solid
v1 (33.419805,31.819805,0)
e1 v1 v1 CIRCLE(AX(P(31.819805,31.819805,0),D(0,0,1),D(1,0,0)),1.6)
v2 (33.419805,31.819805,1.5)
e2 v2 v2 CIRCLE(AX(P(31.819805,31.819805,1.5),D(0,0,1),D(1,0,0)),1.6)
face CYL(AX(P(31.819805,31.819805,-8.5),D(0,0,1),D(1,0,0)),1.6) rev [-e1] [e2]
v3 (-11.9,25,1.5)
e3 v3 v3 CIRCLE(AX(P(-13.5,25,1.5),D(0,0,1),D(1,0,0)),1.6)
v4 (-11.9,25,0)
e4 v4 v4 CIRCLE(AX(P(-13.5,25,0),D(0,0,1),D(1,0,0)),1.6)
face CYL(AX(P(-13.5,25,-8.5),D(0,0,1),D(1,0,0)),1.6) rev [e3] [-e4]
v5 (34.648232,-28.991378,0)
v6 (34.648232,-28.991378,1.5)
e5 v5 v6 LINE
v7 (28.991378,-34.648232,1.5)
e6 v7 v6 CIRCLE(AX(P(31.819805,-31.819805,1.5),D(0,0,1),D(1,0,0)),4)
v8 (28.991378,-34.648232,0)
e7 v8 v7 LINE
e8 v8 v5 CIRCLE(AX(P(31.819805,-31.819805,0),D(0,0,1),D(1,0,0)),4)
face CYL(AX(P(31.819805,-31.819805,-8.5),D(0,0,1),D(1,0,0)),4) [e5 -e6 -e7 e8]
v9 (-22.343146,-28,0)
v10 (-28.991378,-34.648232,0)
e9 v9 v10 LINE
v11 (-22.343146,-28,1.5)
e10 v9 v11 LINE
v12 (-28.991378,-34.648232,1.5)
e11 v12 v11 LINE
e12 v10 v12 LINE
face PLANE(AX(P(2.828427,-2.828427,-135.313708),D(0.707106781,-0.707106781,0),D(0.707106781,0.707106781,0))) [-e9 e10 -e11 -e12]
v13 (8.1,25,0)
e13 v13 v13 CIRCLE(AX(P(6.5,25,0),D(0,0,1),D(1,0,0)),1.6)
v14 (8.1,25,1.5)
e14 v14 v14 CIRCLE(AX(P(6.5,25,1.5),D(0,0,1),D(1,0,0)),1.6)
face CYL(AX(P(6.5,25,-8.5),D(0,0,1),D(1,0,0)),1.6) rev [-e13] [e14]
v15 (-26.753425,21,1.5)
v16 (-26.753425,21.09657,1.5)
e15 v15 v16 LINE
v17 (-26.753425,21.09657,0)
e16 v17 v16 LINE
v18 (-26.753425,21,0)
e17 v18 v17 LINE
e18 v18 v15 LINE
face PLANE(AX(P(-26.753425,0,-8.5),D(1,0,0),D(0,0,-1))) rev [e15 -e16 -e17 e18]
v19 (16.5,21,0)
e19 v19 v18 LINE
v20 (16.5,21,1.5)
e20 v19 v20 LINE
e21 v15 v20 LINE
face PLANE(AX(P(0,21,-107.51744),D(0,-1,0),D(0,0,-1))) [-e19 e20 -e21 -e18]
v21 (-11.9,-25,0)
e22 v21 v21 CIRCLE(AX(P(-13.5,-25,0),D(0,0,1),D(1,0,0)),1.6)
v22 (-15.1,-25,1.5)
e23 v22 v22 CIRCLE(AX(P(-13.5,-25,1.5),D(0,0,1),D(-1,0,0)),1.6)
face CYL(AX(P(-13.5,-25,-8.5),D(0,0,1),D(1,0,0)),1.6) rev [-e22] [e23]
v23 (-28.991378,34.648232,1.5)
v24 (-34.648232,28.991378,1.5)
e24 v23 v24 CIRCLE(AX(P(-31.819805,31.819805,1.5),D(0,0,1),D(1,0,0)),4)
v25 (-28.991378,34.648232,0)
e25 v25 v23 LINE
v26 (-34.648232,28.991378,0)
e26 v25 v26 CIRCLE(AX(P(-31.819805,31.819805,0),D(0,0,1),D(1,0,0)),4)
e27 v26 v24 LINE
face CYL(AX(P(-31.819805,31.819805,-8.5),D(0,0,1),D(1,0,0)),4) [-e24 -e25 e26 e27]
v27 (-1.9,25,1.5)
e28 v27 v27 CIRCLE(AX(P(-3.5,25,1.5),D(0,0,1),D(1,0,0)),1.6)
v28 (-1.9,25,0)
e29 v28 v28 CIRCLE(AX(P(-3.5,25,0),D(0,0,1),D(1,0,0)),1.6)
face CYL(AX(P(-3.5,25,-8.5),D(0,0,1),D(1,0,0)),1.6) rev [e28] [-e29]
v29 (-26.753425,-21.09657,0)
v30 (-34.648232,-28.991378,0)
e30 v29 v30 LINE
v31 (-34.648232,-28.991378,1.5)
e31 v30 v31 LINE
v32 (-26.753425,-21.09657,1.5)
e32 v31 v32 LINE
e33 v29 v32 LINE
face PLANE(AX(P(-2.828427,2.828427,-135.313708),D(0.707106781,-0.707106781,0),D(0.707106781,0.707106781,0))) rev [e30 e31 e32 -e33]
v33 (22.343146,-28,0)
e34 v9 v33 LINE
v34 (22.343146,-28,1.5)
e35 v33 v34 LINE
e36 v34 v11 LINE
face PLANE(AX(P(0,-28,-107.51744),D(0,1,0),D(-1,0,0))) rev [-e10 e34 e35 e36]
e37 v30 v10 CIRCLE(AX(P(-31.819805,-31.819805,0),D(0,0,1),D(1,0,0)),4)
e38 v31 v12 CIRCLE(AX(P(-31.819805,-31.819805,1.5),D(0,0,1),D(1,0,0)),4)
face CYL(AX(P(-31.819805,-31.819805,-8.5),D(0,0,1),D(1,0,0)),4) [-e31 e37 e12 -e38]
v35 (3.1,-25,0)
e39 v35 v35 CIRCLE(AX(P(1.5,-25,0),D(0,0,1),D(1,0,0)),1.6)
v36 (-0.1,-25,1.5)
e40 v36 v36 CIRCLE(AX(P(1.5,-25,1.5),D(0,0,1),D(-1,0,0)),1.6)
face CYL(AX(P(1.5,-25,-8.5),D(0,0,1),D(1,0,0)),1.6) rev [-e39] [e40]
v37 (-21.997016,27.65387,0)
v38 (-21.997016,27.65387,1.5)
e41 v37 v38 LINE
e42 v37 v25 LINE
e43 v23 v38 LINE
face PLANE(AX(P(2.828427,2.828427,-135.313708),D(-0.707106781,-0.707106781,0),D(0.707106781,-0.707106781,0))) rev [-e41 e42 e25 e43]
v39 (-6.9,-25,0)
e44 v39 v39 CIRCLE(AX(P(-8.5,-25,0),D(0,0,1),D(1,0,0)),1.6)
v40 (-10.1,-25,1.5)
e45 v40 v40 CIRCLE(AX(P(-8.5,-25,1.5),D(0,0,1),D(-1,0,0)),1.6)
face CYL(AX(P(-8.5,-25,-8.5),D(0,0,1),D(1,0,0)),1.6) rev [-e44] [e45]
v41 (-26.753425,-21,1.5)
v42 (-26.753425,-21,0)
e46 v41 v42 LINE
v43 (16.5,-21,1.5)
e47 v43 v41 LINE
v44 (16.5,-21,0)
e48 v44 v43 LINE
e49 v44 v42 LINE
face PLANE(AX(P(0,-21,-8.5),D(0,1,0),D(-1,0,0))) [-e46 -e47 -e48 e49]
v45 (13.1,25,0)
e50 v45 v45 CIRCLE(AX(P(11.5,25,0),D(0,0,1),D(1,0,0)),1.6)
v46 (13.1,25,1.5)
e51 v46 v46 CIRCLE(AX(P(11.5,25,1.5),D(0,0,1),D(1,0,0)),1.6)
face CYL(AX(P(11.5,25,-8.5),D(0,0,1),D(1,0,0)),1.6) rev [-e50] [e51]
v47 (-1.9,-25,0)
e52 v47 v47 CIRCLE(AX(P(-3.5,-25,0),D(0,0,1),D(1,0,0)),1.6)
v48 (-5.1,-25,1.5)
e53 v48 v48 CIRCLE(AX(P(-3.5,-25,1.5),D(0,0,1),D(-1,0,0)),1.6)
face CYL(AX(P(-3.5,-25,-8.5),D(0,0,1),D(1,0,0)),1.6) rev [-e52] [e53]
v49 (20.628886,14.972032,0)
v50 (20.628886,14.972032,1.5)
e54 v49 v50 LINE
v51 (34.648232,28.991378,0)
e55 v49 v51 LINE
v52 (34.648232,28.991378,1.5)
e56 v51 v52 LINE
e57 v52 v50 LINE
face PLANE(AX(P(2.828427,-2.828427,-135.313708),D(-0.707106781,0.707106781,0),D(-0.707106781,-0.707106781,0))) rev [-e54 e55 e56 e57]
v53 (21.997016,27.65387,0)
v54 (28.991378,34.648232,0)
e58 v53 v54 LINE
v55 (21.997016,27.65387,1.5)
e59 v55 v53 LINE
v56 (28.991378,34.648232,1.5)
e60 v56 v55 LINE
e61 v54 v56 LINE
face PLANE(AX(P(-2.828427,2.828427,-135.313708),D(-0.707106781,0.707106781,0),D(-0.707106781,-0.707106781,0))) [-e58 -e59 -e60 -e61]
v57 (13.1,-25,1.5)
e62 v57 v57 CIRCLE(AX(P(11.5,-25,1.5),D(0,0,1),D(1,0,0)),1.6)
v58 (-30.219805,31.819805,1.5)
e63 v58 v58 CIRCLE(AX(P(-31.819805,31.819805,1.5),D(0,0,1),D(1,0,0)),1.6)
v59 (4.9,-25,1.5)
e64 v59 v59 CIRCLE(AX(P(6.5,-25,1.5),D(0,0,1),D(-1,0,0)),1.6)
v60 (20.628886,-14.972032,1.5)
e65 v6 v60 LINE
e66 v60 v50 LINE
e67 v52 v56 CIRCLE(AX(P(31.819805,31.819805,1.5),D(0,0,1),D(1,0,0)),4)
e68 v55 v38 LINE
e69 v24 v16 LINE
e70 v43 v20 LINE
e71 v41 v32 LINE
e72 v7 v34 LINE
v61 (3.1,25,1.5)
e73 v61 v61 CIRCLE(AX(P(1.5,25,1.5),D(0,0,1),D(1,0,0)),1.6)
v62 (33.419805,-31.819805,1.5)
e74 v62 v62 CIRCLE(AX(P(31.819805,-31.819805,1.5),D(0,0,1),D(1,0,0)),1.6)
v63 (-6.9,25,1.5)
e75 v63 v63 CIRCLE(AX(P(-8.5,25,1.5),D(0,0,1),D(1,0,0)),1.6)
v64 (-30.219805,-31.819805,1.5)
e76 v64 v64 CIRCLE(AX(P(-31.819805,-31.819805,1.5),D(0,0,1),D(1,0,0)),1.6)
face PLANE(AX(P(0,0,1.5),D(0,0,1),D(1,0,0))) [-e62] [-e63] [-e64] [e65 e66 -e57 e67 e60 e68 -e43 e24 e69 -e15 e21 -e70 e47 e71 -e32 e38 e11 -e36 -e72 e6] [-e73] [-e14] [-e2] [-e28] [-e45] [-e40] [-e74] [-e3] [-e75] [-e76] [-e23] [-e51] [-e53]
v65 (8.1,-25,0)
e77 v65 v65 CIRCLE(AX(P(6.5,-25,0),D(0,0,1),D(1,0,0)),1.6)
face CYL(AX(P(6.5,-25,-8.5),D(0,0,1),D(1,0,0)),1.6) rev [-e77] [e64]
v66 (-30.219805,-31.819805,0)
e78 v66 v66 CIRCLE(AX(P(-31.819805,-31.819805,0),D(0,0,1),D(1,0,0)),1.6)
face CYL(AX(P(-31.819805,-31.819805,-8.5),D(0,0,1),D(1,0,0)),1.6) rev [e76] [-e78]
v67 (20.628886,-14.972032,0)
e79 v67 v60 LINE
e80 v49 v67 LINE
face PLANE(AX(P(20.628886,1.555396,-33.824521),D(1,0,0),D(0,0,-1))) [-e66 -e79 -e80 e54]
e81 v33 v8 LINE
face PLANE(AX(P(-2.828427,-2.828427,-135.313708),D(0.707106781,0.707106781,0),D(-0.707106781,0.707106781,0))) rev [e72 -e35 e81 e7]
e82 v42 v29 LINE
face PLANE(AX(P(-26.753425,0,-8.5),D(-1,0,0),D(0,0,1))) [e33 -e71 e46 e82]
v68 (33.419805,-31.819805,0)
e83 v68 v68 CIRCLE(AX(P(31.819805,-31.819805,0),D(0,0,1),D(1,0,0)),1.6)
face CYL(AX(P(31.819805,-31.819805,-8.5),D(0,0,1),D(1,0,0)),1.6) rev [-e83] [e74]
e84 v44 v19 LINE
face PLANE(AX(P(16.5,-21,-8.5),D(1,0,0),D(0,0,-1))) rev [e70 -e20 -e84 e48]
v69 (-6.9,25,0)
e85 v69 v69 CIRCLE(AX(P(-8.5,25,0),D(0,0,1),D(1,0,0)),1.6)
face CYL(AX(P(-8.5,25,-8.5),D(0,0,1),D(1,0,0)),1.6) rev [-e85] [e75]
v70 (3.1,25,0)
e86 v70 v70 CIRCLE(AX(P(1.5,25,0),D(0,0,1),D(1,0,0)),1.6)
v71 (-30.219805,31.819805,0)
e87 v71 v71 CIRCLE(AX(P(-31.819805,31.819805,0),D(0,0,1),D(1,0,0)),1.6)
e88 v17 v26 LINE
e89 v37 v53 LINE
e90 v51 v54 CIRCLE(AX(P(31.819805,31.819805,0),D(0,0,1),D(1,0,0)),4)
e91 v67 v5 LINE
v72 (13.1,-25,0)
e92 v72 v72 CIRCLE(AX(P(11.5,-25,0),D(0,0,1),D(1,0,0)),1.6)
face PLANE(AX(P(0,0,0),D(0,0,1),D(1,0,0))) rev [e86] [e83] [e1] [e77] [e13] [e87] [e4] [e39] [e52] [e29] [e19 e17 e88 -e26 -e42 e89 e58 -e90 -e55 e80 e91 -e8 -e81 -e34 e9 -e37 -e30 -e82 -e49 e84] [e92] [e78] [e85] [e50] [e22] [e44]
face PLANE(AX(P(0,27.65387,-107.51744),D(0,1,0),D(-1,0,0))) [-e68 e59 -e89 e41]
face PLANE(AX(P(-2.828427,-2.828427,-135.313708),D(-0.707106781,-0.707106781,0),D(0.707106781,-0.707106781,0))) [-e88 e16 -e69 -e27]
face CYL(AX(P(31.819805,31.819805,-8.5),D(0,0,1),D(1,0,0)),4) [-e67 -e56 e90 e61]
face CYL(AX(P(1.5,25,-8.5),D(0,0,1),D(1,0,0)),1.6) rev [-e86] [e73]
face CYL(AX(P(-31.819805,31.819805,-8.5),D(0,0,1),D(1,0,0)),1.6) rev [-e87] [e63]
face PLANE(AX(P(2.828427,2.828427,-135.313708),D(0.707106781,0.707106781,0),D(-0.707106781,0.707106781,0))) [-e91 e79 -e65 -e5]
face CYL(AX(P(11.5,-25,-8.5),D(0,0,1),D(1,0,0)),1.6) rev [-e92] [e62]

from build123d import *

# Parameters (mm, degrees)
CUT_EXTRUDE1_START       = -1.5
CUT_EXTRUDE1_OUTLINE_R   = 1.6
CUT_EXTRUDE1_DEPTH       = 1.5
CUT_EXTRUDE1_2_OUTLINE_R = 1.6
CUT_EXTRUDE1_2_DEPTH     = 1.5
CUT_EXTRUDE1_3_OUTLINE_R = 1.6
CUT_EXTRUDE1_3_DEPTH     = 1.5
BOSS_EXTRUDE1_DEPTH      = 1.5
BOSS_EXTRUDE2_DEPTH      = 1.5
BOSS_EXTRUDE3_START      = -1.5
SKETCH4_W                = 8
SKETCH4_H                = 34
SKETCH4_R                = 1.6
BOSS_EXTRUDE3_DEPTH      = 1.5
CUT_EXTRUDE2_DEPTH       = 10
SKETCH6_R                = 1.6
CUT_EXTRUDE3_DEPTH       = 10
CUT_EXTRUDE4_DEPTH       = 10
SKETCH8_R                = 1.6
CUT_EXTRUDE6_DEPTH       = 10
BOSS_EXTRUDE4_DEPTH      = 1.5
SKETCH10_W               = 3.5
SKETCH10_H               = 42
CUT_EXTRUDE7_DEPTH       = 10
CUT_EXTRUDE8_START       = -10
SKETCH11_R               = 1.6
CUT_EXTRUDE8_DEPTH       = 10
BOSS_EXTRUDE5_DEPTH      = 1.5
SKETCH13_R               = 1.6
BOSS_EXTRUDE6_DEPTH      = 1.5
SKETCH14_R               = 1.6
CUT_EXTRUDE9_DEPTH       = 10
BOSS_EXTRUDE7_DEPTH      = 1.5
SKETCH16_R               = 1.6
CUT_EXTRUDE10_DEPTH      = 10
SKETCH17_R               = 1.6
BOSS_EXTRUDE8_DEPTH      = 1.5
SKETCH18_R               = 1.6
CUT_EXTRUDE11_DEPTH      = 10
CUT_EXTRUDE12_START      = -2
CUT_EXTRUDE12_OUTLINE_R  = 1.6
CUT_EXTRUDE12_DEPTH      = 3
SKETCH20_R               = 1.6
BOSS_EXTRUDE9_DEPTH      = 1.5
SKETCH21_R               = 1.6
BOSS_EXTRUDE10_DEPTH     = 1.5
SKETCH22_R               = 89.618816207
CUT_EXTRUDE13_DEPTH      = 10


with BuildPart() as part:
    # Cut-Extrude1: read off the stored shape, not the designer's step
    # Cut-Extrude1 outline → Cut-Extrude1 (new body)
    with BuildSketch(Plane.XY.offset(1.5).offset(CUT_EXTRUDE1_START)):
        with BuildLine():
            ThreePointArc((-32.828427125, -27.171572875), (-32.828427125, -32.828427125), (-27.171572875, -32.828427125))
            Line((-27.171572875, -32.828427125), (-15.343145751, -21))
            Line((-15.343145751, -21), (-28, -21))
            Line((-28, -21), (-28, -22.246575342))
            Line((-28, -22.246575342), (-32.876712329, -27.123287671))
            Line((-32.876712329, -27.123287671), (-32.828427125, -27.171572875))
        make_face()
        with Locations((-30, -30)):
            Circle(CUT_EXTRUDE1_OUTLINE_R, mode=Mode.SUBTRACT)
    extrude(amount=CUT_EXTRUDE1_DEPTH)



with BuildPart() as body_2:
    # Cut-Extrude1 2 outline → Cut-Extrude1 2 (new body)
    with BuildSketch(Plane.XY.offset(1.5).offset(CUT_EXTRUDE1_START)):
        with BuildLine():
            Line((21, 31.740068927), (21, -13))
            Line((21, -13), (13, -13))
            Line((13, -13), (13, -20))
            Line((13, -20), (14.343145751, -20))
            Line((14.343145751, -20), (27.171572875, -32.828427125))
            ThreePointArc((27.171572875, -32.828427125), (32.828427125, -32.828427125), (32.828427125, -27.171572875))
            Line((32.828427125, -27.171572875), (28, -22.343145751))
            Line((28, -22.343145751), (28, 27.653870467))
            Line((28, 27.653870467), (36.085493114, 37.454468181))
            ThreePointArc((36.085493114, 37.454468181), (35.545531819, 43.085493114), (29.914506886, 42.545531819))
            Line((29.914506886, 42.545531819), (21, 31.740068927))
        make_face()
        with Locations((30, -30)):
            Circle(CUT_EXTRUDE1_2_OUTLINE_R, mode=Mode.SUBTRACT)
        with Locations((25, -6.5)):
            Circle(CUT_EXTRUDE1_2_OUTLINE_R, mode=Mode.SUBTRACT)
        with Locations((25, -1.5)):
            Circle(CUT_EXTRUDE1_2_OUTLINE_R, mode=Mode.SUBTRACT)
        with Locations((25, 3.5)):
            Circle(CUT_EXTRUDE1_2_OUTLINE_R, mode=Mode.SUBTRACT)
        with Locations((25, 8.5)):
            Circle(CUT_EXTRUDE1_2_OUTLINE_R, mode=Mode.SUBTRACT)
        with Locations((25, 13.5)):
            Circle(CUT_EXTRUDE1_2_OUTLINE_R, mode=Mode.SUBTRACT)
        with Locations((33, 40)):
            Circle(CUT_EXTRUDE1_2_OUTLINE_R, mode=Mode.SUBTRACT)
    extrude(amount=CUT_EXTRUDE1_2_DEPTH)



with BuildPart() as body_3:
    # Cut-Extrude1 3 outline → Cut-Extrude1 3 (new body)
    with BuildSketch(Plane.XY.offset(1.5).offset(CUT_EXTRUDE1_START)):
        with BuildLine():
            Line((-28, 21), (-21, 21))
            Line((-21, 21), (-21, 31.740068927))
            Line((-21, 31.740068927), (-29.914506886, 42.545531819))
            ThreePointArc((-29.914506886, 42.545531819), (-35.545531819, 43.085493114), (-36.085493114, 37.454468181))
            Line((-36.085493114, 37.454468181), (-28, 27.653870467))
            Line((-28, 27.653870467), (-28, 21))
        make_face()
        with Locations((-33, 40)):
            Circle(CUT_EXTRUDE1_3_OUTLINE_R, mode=Mode.SUBTRACT)
    extrude(amount=CUT_EXTRUDE1_3_DEPTH)


with BuildPart() as body_2_1:
    add(body_2.part)

    add(body_3.part)  # Boss-Extrude1 merges body 3
    # Sketch2 → Boss-Extrude1 (add)
    with BuildSketch(Plane.XY.offset(1.5)):
        Polygon((-21, 21), (21, 21), (21, 31.740068927), (17.62888627, 27.653870467), (-17.62888627, 27.653870467), (-21, 31.740068927), align=None)
    extrude(amount=-BOSS_EXTRUDE1_DEPTH)


with BuildPart() as part_1:
    add(part.part)

    add(body_2_1.part)  # Boss-Extrude2 merges body 2
    # Sketch3 → Boss-Extrude2 (add)
    with BuildSketch(Plane.XY.offset(1.5)):
        Polygon((-15.343145751, -21), (-22.343145751, -28), (22.343145751, -28), (15.343145751, -21), align=None)
    extrude(amount=-BOSS_EXTRUDE2_DEPTH)

    # Sketch4 → Boss-Extrude3 (add)
    with BuildSketch(Plane.XY.offset(1.5).offset(BOSS_EXTRUDE3_START)):
        Polygon((14.343145751, -20), (13, -20), (13, -21), (15.343145751, -21), align=None)
        with Locations((17, 4)):
            Rectangle(SKETCH4_W, SKETCH4_H)
        with Locations((25, -6.5)):
            Circle(SKETCH4_R)
        with Locations((25, -1.5)):
            Circle(SKETCH4_R)
        with Locations((25, 3.5)):
            Circle(SKETCH4_R)
        with Locations((25, 8.5)):
            Circle(SKETCH4_R)
        with Locations((25, 13.5)):
            Circle(SKETCH4_R)
    extrude(amount=BOSS_EXTRUDE3_DEPTH)

    # Sketch5 → Cut-Extrude2 (cut)
    with BuildSketch(Plane.XY.offset(1.5)):
        Polygon((28, 27.653870467), (17.62888627, 15.082823521), (17.62888627, -11.972032021), (28, -22.343145751), align=None)
    extrude(amount=-CUT_EXTRUDE2_DEPTH, mode=Mode.SUBTRACT)

    # Sketch6 → Cut-Extrude3 (cut)
    with BuildSketch(Plane.XY.offset(1.5)):
        with Locations((6.5, 25)):
            Circle(SKETCH6_R)
        with Locations((1.5, 25)):
            Circle(SKETCH6_R)
        with Locations((-3.5, 25)):
            Circle(SKETCH6_R)
        with Locations((-8.5, 25)):
            Circle(SKETCH6_R)
        with Locations((-13.5, 25)):
            Circle(SKETCH6_R)
        with Locations((-13.5, -25)):
            Circle(SKETCH6_R)
        with Locations((-8.5, -25)):
            Circle(SKETCH6_R)
        with Locations((-3.5, -25)):
            Circle(SKETCH6_R)
        with Locations((1.5, -25)):
            Circle(SKETCH6_R)
        with Locations((6.5, -25)):
            Circle(SKETCH6_R)
    extrude(amount=-CUT_EXTRUDE3_DEPTH, mode=Mode.SUBTRACT)

    # Sketch7 → Cut-Extrude4 (cut)
    with BuildSketch(Plane.XY.offset(1.5)):
        Polygon((-28, 27.653870467), (-19.973613934, 17.924917659), (-36.717571938, 15.874580857), align=None)
        Polygon((-28, -22.246575342), (-20.930672911, -15.177248254), (-29.189636074, -18.711911798), align=None)
    extrude(amount=-CUT_EXTRUDE4_DEPTH, mode=Mode.SUBTRACT)

    # Sketch8 → Cut-Extrude6 (cut)
    with BuildSketch(Plane.XY.offset(1.5)):
        with Locations((11.5, -25)):
            Circle(SKETCH8_R)
        with Locations((11.5, 25)):
            Circle(SKETCH8_R)
    extrude(amount=-CUT_EXTRUDE6_DEPTH, mode=Mode.SUBTRACT)

    # Sketch9 → Boss-Extrude4 (add)
    with BuildSketch(Plane.XY.offset(1.5)):
        Polygon((20.62888627, 1.55539575), (20.62888627, 18.719187158), (17.62888627, 15.082823521), (17.62888627, -11.972032021), (20.62888627, -14.972032021), align=None)
    extrude(amount=-BOSS_EXTRUDE4_DEPTH)

    # Sketch10 → Cut-Extrude7 (cut)
    with BuildSketch(Plane.XY.offset(1.5)):
        with Locations((14.75, 0)):
            Rectangle(SKETCH10_W, SKETCH10_H)
    extrude(amount=-CUT_EXTRUDE7_DEPTH, mode=Mode.SUBTRACT)

    # Sketch11 → Cut-Extrude8 (cut)
    # profile 1 of 4: a face of its own
    with BuildSketch(Plane.XY.offset(1.5).offset(CUT_EXTRUDE8_START)):
        with BuildLine():
            Line((20.62888627, 27.653870467), (20.62888627, 18.719187158))
            Line((20.62888627, 18.719187158), (36.085493114, 37.454468181))
            ThreePointArc((36.085493114, 37.454468181), (35.545531819, 43.085493114), (29.914506886, 42.545531819))
            Line((29.914506886, 42.545531819), (17.62888627, 27.653870467))
            Line((17.62888627, 27.653870467), (20.62888627, 27.653870467))
        make_face()
        with Locations((33, 40)):
            Circle(SKETCH11_R, mode=Mode.SUBTRACT)
    # profile 2 of 4: a face of its own
    with BuildSketch(Plane.XY.offset(1.5).offset(CUT_EXTRUDE8_START)):
        with BuildLine():
            Line((-36.085493114, 37.454468181), (-26.753424658, 26.142870052))
            Line((-26.753424658, 26.142870052), (-26.753424658, 27.653870467))
            Line((-26.753424658, 27.653870467), (-17.62888627, 27.653870467))
            Line((-17.62888627, 27.653870467), (-29.914506886, 42.545531819))
            ThreePointArc((-29.914506886, 42.545531819), (-35.545531819, 43.085493114), (-36.085493114, 37.454468181))
        make_face()
        with Locations((-33, 40)):
            Circle(SKETCH11_R, mode=Mode.SUBTRACT)
    # profile 3 of 4: a face of its own
    with BuildSketch(Plane.XY.offset(1.5).offset(CUT_EXTRUDE8_START)):
        with BuildLine():
            Line((-27.171572875, -32.828427125), (-22.343145751, -28))
            Line((-22.343145751, -28), (-26.753424658, -28))
            Line((-26.753424658, -28), (-26.753424658, -21))
            Line((-26.753424658, -21), (-32.876712329, -27.123287671))
            Line((-32.876712329, -27.123287671), (-32.828427125, -27.171572875))
            ThreePointArc((-32.828427125, -27.171572875), (-32.828427125, -32.828427125), (-27.171572875, -32.828427125))
        make_face()
        with Locations((-30, -30)):
            Circle(SKETCH11_R, mode=Mode.SUBTRACT)
    # profile 4 of 4: a face of its own
    with BuildSketch(Plane.XY.offset(1.5).offset(CUT_EXTRUDE8_START)):
        with BuildLine():
            Line((32.828427125, -27.171572875), (20.62888627, -14.972032021))
            Line((20.62888627, -14.972032021), (20.62888627, -28))
            Line((20.62888627, -28), (22.343145751, -28))
            Line((22.343145751, -28), (27.171572875, -32.828427125))
            ThreePointArc((27.171572875, -32.828427125), (32.828427125, -32.828427125), (32.828427125, -27.171572875))
        make_face()
        with Locations((30, -30)):
            Circle(SKETCH11_R, mode=Mode.SUBTRACT)
    extrude(amount=CUT_EXTRUDE8_DEPTH, mode=Mode.SUBTRACT)

    # Sketch12 → Boss-Extrude5 (add)
    with BuildSketch(Plane.XY.offset(1.5)):
        Polygon((-22.510556865, 21), (-26.753424658, 21), (-26.753424658, 26.142870052), align=None)
    extrude(amount=-BOSS_EXTRUDE5_DEPTH)

    # Sketch13 → Boss-Extrude6 (add)
    # profile 1 of 4: a face of its own
    with BuildSketch(Plane.XY.offset(1.5)):
        with BuildLine():
            Line((20.62888627, 26.28574052), (20.62888627, 14.972032021))
            Line((20.62888627, 14.972032021), (46.669047558, 41.012193309))
            ThreePointArc((46.669047558, 41.012193309), (46.669047558, 46.669047558), (41.012193309, 46.669047558))
            Line((41.012193309, 46.669047558), (20.62888627, 26.28574052))
        make_face()
    # profile 2 of 4: a face of its own
    with BuildSketch(Plane.XY.offset(1.5)):
        with BuildLine():
            Line((-46.669047558, 41.012193309), (-26.753424658, 21.096570408))
            Line((-26.753424658, 21.096570408), (-26.753424658, 27.653870467))
            Line((-26.753424658, 27.653870467), (-21.997016217, 27.653870467))
            Line((-21.997016217, 27.653870467), (-41.012193309, 46.669047558))
            ThreePointArc((-41.012193309, 46.669047558), (-46.669047558, 46.669047558), (-46.669047558, 41.012193309))
        make_face()
        with Locations((-43.840620434, 43.840620434)):
            Circle(SKETCH13_R, mode=Mode.SUBTRACT)
    # profile 3 of 4: a face of its own
    with BuildSketch(Plane.XY.offset(1.5)):
        with BuildLine():
            ThreePointArc((-46.669047558, -41.012193309), (-46.669047558, -46.669047558), (-41.012193309, -46.669047558))
            Line((-41.012193309, -46.669047558), (-22.343145751, -28))
            Line((-22.343145751, -28), (-26.753424658, -28))
            Line((-26.753424658, -28), (-26.753424658, -21.096570408))
            Line((-26.753424658, -21.096570408), (-46.669047558, -41.012193309))
        make_face()
        with Locations((-43.840620434, -43.840620434)):
            Circle(SKETCH13_R, mode=Mode.SUBTRACT)
    # profile 4 of 4: a face of its own
    with BuildSketch(Plane.XY.offset(1.5)):
        with BuildLine():
            Line((20.62888627, -26.28574052), (41.012193309, -46.669047558))
            ThreePointArc((41.012193309, -46.669047558), (46.669047558, -46.669047558), (46.669047558, -41.012193309))
            Line((46.669047558, -41.012193309), (20.62888627, -14.972032021))
            Line((20.62888627, -14.972032021), (20.62888627, -26.28574052))
        make_face()
        with Locations((43.840620434, -43.840620434)):
            Circle(SKETCH13_R, mode=Mode.SUBTRACT)
    extrude(amount=-BOSS_EXTRUDE6_DEPTH)

    # Sketch14 → Cut-Extrude9 (cut)
    with BuildSketch(Plane.XY.offset(1.5)):
        with Locations((43.840620434, 43.840620434)):
            Circle(SKETCH14_R)
    extrude(amount=-CUT_EXTRUDE9_DEPTH, mode=Mode.SUBTRACT)

    # Sketch15 → Boss-Extrude7 (add)
    with BuildSketch(Plane.XY.offset(1.5)):
        Polygon((20.62888627, -28), (22.343145751, -28), (22.343145751, -20.852318202), (17.520154223, -24.044979555), align=None)
        Polygon((20.62888627, 27.653870467), (24.477160925, 27.653870467), (19.074520247, 22.251229789), (17.520154223, 26.392880602), align=None)
    extrude(amount=-BOSS_EXTRUDE7_DEPTH)

    # Sketch16 → Cut-Extrude10 (cut)
    with BuildSketch(Plane.XY.offset(1.5)):
        with Locations((-31.819805153, 31.819805153)):
            Circle(SKETCH16_R)
        with Locations((31.819805153, 31.819805153)):
            Circle(SKETCH16_R)
        with Locations((31.819805153, -31.819805153)):
            Circle(SKETCH16_R)
        with Locations((-31.819805153, -31.819805153)):
            Circle(SKETCH16_R)
    extrude(amount=-CUT_EXTRUDE10_DEPTH, mode=Mode.SUBTRACT)

    # Sketch17 → Boss-Extrude8 (add)
    with BuildSketch(Plane.XY.offset(1.5)):
        with BuildLine():
            ThreePointArc((-31.819805153, 35.819805153), (-28.355703538, 33.819805153), (-28.355703538, 29.819805153))
            Line((-28.355703538, 29.819805153), (28.355703538, 29.819805153))
            ThreePointArc((28.355703538, 29.819805153), (28.355703538, 33.819805153), (31.819805153, 35.819805153))
            Line((31.819805153, 35.819805153), (-31.819805153, 35.819805153))
        make_face()
        with Locations((-8, 32.819805153)):
            Circle(SKETCH17_R, mode=Mode.SUBTRACT)
        with Locations((8, 32.819805153)):
            Circle(SKETCH17_R, mode=Mode.SUBTRACT)
    extrude(amount=-BOSS_EXTRUDE8_DEPTH)

    # Sketch18 → Cut-Extrude11 (cut)
    with BuildSketch(Plane.XY.offset(1.5)):
        with Locations((38.890872965, -38.890872965)):
            Circle(SKETCH18_R)
        with Locations((-38.890872965, -38.890872965)):
            Circle(SKETCH18_R)
        with Locations((38.890872965, 38.890872965)):
            Circle(SKETCH18_R)
        with Locations((-38.890872965, 38.890872965)):
            Circle(SKETCH18_R)
    extrude(amount=-CUT_EXTRUDE11_DEPTH, mode=Mode.SUBTRACT)

    # Cut-Extrude12: read off the stored shape, not the designer's step
    # Cut-Extrude12 outline → Cut-Extrude12 (cut)
    # profile 1 of 4: a face of its own
    with BuildSketch(Plane.XY.offset(1.5).offset(CUT_EXTRUDE12_START)):
        with BuildLine():
            Line((36.222978367, 41.879832617), (36.224492351, 41.872552763))
            ThreePointArc((36.224492351, 41.872552763), (41.797056095, 41.639345199), (41.71930009, 36.062445841))
            Line((41.71930009, 36.062445841), (46.669047558, 41.012193309))
            ThreePointArc((46.669047558, 41.012193309), (46.669047558, 46.669047558), (41.012193309, 46.669047558))
            Line((41.012193309, 46.669047558), (36.222978367, 41.879832617))
        make_face()
        with Locations((43.840620434, 43.840620434)):
            Circle(CUT_EXTRUDE12_OUTLINE_R, mode=Mode.SUBTRACT)
    # profile 2 of 4: a face of its own
    with BuildSketch(Plane.XY.offset(1.5).offset(CUT_EXTRUDE12_START)):
        with BuildLine():
            ThreePointArc((41.71930009, -36.062445841), (41.71930009, -41.71930009), (36.062445841, -41.71930009))
            Line((36.062445841, -41.71930009), (41.012193309, -46.669047558))
            ThreePointArc((41.012193309, -46.669047558), (46.669047558, -46.669047558), (46.669047558, -41.012193309))
            Line((46.669047558, -41.012193309), (41.71930009, -36.062445841))
        make_face()
        with Locations((43.840620434, -43.840620434)):
            Circle(CUT_EXTRUDE12_OUTLINE_R, mode=Mode.SUBTRACT)
    # profile 3 of 4: a face of its own
    with BuildSketch(Plane.XY.offset(1.5).offset(CUT_EXTRUDE12_START)):
        with BuildLine():
            ThreePointArc((-36.062445841, -41.71930009), (-41.550778866, -41.878330178), (-42.027335486, -36.408413931))
            Line((-42.027335486, -36.408413931), (-42.048509384, -36.391655135))
            Line((-42.048509384, -36.391655135), (-46.669047558, -41.012193309))
            ThreePointArc((-46.669047558, -41.012193309), (-46.669047558, -46.669047558), (-41.012193309, -46.669047558))
            Line((-41.012193309, -46.669047558), (-36.062445841, -41.71930009))
        make_face()
        with Locations((-43.840620434, -43.840620434)):
            Circle(CUT_EXTRUDE12_OUTLINE_R, mode=Mode.SUBTRACT)
    # profile 4 of 4: a face of its own
    with BuildSketch(Plane.XY.offset(1.5).offset(CUT_EXTRUDE12_START)):
        with BuildLine():
            ThreePointArc((-41.815610055, 36.162152944), (-41.66986379, 41.767887042), (-36.062445841, 41.71930009))
            Line((-36.062445841, 41.71930009), (-41.012193309, 46.669047558))
            ThreePointArc((-41.012193309, 46.669047558), (-46.669047558, 46.669047558), (-46.669047558, 41.012193309))
            Line((-46.669047558, 41.012193309), (-41.817773996, 36.160919747))
            Line((-41.817773996, 36.160919747), (-41.815610055, 36.162152944))
        make_face()
        with Locations((-43.840620434, 43.840620434)):
            Circle(CUT_EXTRUDE12_OUTLINE_R, mode=Mode.SUBTRACT)
    extrude(amount=CUT_EXTRUDE12_DEPTH, mode=Mode.SUBTRACT)

    # Sketch20 → Boss-Extrude9 (add)
    # profile 1 of 2: a face of its own
    with BuildSketch(Plane.XY.offset(1.5)):
        Polygon((-30.162950904, 35.819805153), (-24.162950904, 29.819805153), (24.162950904, 29.819805153), (30.162950904, 35.819805153), align=None)
        with Locations((-8, 32.819805153)):
            Circle(SKETCH20_R, mode=Mode.SUBTRACT)
        with Locations((8, 32.819805153)):
            Circle(SKETCH20_R, mode=Mode.SUBTRACT)
    # profile 2 of 2: a face of its own
    with BuildSketch(Plane.XY.offset(1.5)):
        Polygon((30.162950904, -35.819805153), (-30.162950904, -35.819805153), (-24.162950904, -29.819805153), (24.162950904, -29.819805153), align=None)
        with Locations((8, -32.819805153)):
            Circle(SKETCH20_R, mode=Mode.SUBTRACT)
        with Locations((-8, -32.819805153)):
            Circle(SKETCH20_R, mode=Mode.SUBTRACT)
    extrude(amount=-BOSS_EXTRUDE9_DEPTH)

    # Sketch21 → Boss-Extrude10 (add)
    with BuildSketch(Plane.XY.offset(1.5)):
        Polygon((24.162950904, 24.506096654), (24.162950904, -29.819805153), (30.162950904, -26.836364226), (30.162950904, 24.506096654), align=None)
        with Locations((27.162950904, 8)):
            Circle(SKETCH21_R, mode=Mode.SUBTRACT)
        with Locations((27.162950904, -8)):
            Circle(SKETCH21_R, mode=Mode.SUBTRACT)
    extrude(amount=-BOSS_EXTRUDE10_DEPTH)

    # Sketch22 → Cut-Extrude13 (cut)
    with BuildSketch(Plane.XY.offset(1.5)):
        Circle(SKETCH22_R)
        with BuildLine():
            Line((-24.162950904, -29.819805153), (-28.991378029, -34.648232278))
            ThreePointArc((-28.991378029, -34.648232278), (-34.648232278, -34.648232278), (-34.648232278, -28.991378029))
            Line((-34.648232278, -28.991378029), (-26.753424658, -21.096570408))
            Line((-26.753424658, -21.096570408), (-26.753424658, -21))
            Line((-26.753424658, -21), (-26.753424658, 21.096570408))
            Line((-26.753424658, 21.096570408), (-34.648232278, 28.991378029))
            ThreePointArc((-34.648232278, 28.991378029), (-34.648232278, 34.648232278), (-28.991378029, 34.648232278))
            Line((-28.991378029, 34.648232278), (-21.997016217, 27.653870467))
            Line((-21.997016217, 27.653870467), (21.997016217, 27.653870467))
            Line((21.997016217, 27.653870467), (28.991378029, 34.648232278))
            ThreePointArc((28.991378029, 34.648232278), (34.648232278, 34.648232278), (34.648232278, 28.991378029))
            Line((34.648232278, 28.991378029), (20.62888627, 14.972032021))
            Line((20.62888627, 14.972032021), (20.62888627, -14.972032021))
            Line((20.62888627, -14.972032021), (34.648232278, -28.991378029))
            ThreePointArc((34.648232278, -28.991378029), (34.648232278, -34.648232278), (28.991378029, -34.648232278))
            Line((28.991378029, -34.648232278), (24.162950904, -29.819805153))
            Line((24.162950904, -29.819805153), (-24.162950904, -29.819805153))
        make_face(mode=Mode.SUBTRACT)
    extrude(amount=-CUT_EXTRUDE13_DEPTH, mode=Mode.SUBTRACT)


solid = part_1.part
